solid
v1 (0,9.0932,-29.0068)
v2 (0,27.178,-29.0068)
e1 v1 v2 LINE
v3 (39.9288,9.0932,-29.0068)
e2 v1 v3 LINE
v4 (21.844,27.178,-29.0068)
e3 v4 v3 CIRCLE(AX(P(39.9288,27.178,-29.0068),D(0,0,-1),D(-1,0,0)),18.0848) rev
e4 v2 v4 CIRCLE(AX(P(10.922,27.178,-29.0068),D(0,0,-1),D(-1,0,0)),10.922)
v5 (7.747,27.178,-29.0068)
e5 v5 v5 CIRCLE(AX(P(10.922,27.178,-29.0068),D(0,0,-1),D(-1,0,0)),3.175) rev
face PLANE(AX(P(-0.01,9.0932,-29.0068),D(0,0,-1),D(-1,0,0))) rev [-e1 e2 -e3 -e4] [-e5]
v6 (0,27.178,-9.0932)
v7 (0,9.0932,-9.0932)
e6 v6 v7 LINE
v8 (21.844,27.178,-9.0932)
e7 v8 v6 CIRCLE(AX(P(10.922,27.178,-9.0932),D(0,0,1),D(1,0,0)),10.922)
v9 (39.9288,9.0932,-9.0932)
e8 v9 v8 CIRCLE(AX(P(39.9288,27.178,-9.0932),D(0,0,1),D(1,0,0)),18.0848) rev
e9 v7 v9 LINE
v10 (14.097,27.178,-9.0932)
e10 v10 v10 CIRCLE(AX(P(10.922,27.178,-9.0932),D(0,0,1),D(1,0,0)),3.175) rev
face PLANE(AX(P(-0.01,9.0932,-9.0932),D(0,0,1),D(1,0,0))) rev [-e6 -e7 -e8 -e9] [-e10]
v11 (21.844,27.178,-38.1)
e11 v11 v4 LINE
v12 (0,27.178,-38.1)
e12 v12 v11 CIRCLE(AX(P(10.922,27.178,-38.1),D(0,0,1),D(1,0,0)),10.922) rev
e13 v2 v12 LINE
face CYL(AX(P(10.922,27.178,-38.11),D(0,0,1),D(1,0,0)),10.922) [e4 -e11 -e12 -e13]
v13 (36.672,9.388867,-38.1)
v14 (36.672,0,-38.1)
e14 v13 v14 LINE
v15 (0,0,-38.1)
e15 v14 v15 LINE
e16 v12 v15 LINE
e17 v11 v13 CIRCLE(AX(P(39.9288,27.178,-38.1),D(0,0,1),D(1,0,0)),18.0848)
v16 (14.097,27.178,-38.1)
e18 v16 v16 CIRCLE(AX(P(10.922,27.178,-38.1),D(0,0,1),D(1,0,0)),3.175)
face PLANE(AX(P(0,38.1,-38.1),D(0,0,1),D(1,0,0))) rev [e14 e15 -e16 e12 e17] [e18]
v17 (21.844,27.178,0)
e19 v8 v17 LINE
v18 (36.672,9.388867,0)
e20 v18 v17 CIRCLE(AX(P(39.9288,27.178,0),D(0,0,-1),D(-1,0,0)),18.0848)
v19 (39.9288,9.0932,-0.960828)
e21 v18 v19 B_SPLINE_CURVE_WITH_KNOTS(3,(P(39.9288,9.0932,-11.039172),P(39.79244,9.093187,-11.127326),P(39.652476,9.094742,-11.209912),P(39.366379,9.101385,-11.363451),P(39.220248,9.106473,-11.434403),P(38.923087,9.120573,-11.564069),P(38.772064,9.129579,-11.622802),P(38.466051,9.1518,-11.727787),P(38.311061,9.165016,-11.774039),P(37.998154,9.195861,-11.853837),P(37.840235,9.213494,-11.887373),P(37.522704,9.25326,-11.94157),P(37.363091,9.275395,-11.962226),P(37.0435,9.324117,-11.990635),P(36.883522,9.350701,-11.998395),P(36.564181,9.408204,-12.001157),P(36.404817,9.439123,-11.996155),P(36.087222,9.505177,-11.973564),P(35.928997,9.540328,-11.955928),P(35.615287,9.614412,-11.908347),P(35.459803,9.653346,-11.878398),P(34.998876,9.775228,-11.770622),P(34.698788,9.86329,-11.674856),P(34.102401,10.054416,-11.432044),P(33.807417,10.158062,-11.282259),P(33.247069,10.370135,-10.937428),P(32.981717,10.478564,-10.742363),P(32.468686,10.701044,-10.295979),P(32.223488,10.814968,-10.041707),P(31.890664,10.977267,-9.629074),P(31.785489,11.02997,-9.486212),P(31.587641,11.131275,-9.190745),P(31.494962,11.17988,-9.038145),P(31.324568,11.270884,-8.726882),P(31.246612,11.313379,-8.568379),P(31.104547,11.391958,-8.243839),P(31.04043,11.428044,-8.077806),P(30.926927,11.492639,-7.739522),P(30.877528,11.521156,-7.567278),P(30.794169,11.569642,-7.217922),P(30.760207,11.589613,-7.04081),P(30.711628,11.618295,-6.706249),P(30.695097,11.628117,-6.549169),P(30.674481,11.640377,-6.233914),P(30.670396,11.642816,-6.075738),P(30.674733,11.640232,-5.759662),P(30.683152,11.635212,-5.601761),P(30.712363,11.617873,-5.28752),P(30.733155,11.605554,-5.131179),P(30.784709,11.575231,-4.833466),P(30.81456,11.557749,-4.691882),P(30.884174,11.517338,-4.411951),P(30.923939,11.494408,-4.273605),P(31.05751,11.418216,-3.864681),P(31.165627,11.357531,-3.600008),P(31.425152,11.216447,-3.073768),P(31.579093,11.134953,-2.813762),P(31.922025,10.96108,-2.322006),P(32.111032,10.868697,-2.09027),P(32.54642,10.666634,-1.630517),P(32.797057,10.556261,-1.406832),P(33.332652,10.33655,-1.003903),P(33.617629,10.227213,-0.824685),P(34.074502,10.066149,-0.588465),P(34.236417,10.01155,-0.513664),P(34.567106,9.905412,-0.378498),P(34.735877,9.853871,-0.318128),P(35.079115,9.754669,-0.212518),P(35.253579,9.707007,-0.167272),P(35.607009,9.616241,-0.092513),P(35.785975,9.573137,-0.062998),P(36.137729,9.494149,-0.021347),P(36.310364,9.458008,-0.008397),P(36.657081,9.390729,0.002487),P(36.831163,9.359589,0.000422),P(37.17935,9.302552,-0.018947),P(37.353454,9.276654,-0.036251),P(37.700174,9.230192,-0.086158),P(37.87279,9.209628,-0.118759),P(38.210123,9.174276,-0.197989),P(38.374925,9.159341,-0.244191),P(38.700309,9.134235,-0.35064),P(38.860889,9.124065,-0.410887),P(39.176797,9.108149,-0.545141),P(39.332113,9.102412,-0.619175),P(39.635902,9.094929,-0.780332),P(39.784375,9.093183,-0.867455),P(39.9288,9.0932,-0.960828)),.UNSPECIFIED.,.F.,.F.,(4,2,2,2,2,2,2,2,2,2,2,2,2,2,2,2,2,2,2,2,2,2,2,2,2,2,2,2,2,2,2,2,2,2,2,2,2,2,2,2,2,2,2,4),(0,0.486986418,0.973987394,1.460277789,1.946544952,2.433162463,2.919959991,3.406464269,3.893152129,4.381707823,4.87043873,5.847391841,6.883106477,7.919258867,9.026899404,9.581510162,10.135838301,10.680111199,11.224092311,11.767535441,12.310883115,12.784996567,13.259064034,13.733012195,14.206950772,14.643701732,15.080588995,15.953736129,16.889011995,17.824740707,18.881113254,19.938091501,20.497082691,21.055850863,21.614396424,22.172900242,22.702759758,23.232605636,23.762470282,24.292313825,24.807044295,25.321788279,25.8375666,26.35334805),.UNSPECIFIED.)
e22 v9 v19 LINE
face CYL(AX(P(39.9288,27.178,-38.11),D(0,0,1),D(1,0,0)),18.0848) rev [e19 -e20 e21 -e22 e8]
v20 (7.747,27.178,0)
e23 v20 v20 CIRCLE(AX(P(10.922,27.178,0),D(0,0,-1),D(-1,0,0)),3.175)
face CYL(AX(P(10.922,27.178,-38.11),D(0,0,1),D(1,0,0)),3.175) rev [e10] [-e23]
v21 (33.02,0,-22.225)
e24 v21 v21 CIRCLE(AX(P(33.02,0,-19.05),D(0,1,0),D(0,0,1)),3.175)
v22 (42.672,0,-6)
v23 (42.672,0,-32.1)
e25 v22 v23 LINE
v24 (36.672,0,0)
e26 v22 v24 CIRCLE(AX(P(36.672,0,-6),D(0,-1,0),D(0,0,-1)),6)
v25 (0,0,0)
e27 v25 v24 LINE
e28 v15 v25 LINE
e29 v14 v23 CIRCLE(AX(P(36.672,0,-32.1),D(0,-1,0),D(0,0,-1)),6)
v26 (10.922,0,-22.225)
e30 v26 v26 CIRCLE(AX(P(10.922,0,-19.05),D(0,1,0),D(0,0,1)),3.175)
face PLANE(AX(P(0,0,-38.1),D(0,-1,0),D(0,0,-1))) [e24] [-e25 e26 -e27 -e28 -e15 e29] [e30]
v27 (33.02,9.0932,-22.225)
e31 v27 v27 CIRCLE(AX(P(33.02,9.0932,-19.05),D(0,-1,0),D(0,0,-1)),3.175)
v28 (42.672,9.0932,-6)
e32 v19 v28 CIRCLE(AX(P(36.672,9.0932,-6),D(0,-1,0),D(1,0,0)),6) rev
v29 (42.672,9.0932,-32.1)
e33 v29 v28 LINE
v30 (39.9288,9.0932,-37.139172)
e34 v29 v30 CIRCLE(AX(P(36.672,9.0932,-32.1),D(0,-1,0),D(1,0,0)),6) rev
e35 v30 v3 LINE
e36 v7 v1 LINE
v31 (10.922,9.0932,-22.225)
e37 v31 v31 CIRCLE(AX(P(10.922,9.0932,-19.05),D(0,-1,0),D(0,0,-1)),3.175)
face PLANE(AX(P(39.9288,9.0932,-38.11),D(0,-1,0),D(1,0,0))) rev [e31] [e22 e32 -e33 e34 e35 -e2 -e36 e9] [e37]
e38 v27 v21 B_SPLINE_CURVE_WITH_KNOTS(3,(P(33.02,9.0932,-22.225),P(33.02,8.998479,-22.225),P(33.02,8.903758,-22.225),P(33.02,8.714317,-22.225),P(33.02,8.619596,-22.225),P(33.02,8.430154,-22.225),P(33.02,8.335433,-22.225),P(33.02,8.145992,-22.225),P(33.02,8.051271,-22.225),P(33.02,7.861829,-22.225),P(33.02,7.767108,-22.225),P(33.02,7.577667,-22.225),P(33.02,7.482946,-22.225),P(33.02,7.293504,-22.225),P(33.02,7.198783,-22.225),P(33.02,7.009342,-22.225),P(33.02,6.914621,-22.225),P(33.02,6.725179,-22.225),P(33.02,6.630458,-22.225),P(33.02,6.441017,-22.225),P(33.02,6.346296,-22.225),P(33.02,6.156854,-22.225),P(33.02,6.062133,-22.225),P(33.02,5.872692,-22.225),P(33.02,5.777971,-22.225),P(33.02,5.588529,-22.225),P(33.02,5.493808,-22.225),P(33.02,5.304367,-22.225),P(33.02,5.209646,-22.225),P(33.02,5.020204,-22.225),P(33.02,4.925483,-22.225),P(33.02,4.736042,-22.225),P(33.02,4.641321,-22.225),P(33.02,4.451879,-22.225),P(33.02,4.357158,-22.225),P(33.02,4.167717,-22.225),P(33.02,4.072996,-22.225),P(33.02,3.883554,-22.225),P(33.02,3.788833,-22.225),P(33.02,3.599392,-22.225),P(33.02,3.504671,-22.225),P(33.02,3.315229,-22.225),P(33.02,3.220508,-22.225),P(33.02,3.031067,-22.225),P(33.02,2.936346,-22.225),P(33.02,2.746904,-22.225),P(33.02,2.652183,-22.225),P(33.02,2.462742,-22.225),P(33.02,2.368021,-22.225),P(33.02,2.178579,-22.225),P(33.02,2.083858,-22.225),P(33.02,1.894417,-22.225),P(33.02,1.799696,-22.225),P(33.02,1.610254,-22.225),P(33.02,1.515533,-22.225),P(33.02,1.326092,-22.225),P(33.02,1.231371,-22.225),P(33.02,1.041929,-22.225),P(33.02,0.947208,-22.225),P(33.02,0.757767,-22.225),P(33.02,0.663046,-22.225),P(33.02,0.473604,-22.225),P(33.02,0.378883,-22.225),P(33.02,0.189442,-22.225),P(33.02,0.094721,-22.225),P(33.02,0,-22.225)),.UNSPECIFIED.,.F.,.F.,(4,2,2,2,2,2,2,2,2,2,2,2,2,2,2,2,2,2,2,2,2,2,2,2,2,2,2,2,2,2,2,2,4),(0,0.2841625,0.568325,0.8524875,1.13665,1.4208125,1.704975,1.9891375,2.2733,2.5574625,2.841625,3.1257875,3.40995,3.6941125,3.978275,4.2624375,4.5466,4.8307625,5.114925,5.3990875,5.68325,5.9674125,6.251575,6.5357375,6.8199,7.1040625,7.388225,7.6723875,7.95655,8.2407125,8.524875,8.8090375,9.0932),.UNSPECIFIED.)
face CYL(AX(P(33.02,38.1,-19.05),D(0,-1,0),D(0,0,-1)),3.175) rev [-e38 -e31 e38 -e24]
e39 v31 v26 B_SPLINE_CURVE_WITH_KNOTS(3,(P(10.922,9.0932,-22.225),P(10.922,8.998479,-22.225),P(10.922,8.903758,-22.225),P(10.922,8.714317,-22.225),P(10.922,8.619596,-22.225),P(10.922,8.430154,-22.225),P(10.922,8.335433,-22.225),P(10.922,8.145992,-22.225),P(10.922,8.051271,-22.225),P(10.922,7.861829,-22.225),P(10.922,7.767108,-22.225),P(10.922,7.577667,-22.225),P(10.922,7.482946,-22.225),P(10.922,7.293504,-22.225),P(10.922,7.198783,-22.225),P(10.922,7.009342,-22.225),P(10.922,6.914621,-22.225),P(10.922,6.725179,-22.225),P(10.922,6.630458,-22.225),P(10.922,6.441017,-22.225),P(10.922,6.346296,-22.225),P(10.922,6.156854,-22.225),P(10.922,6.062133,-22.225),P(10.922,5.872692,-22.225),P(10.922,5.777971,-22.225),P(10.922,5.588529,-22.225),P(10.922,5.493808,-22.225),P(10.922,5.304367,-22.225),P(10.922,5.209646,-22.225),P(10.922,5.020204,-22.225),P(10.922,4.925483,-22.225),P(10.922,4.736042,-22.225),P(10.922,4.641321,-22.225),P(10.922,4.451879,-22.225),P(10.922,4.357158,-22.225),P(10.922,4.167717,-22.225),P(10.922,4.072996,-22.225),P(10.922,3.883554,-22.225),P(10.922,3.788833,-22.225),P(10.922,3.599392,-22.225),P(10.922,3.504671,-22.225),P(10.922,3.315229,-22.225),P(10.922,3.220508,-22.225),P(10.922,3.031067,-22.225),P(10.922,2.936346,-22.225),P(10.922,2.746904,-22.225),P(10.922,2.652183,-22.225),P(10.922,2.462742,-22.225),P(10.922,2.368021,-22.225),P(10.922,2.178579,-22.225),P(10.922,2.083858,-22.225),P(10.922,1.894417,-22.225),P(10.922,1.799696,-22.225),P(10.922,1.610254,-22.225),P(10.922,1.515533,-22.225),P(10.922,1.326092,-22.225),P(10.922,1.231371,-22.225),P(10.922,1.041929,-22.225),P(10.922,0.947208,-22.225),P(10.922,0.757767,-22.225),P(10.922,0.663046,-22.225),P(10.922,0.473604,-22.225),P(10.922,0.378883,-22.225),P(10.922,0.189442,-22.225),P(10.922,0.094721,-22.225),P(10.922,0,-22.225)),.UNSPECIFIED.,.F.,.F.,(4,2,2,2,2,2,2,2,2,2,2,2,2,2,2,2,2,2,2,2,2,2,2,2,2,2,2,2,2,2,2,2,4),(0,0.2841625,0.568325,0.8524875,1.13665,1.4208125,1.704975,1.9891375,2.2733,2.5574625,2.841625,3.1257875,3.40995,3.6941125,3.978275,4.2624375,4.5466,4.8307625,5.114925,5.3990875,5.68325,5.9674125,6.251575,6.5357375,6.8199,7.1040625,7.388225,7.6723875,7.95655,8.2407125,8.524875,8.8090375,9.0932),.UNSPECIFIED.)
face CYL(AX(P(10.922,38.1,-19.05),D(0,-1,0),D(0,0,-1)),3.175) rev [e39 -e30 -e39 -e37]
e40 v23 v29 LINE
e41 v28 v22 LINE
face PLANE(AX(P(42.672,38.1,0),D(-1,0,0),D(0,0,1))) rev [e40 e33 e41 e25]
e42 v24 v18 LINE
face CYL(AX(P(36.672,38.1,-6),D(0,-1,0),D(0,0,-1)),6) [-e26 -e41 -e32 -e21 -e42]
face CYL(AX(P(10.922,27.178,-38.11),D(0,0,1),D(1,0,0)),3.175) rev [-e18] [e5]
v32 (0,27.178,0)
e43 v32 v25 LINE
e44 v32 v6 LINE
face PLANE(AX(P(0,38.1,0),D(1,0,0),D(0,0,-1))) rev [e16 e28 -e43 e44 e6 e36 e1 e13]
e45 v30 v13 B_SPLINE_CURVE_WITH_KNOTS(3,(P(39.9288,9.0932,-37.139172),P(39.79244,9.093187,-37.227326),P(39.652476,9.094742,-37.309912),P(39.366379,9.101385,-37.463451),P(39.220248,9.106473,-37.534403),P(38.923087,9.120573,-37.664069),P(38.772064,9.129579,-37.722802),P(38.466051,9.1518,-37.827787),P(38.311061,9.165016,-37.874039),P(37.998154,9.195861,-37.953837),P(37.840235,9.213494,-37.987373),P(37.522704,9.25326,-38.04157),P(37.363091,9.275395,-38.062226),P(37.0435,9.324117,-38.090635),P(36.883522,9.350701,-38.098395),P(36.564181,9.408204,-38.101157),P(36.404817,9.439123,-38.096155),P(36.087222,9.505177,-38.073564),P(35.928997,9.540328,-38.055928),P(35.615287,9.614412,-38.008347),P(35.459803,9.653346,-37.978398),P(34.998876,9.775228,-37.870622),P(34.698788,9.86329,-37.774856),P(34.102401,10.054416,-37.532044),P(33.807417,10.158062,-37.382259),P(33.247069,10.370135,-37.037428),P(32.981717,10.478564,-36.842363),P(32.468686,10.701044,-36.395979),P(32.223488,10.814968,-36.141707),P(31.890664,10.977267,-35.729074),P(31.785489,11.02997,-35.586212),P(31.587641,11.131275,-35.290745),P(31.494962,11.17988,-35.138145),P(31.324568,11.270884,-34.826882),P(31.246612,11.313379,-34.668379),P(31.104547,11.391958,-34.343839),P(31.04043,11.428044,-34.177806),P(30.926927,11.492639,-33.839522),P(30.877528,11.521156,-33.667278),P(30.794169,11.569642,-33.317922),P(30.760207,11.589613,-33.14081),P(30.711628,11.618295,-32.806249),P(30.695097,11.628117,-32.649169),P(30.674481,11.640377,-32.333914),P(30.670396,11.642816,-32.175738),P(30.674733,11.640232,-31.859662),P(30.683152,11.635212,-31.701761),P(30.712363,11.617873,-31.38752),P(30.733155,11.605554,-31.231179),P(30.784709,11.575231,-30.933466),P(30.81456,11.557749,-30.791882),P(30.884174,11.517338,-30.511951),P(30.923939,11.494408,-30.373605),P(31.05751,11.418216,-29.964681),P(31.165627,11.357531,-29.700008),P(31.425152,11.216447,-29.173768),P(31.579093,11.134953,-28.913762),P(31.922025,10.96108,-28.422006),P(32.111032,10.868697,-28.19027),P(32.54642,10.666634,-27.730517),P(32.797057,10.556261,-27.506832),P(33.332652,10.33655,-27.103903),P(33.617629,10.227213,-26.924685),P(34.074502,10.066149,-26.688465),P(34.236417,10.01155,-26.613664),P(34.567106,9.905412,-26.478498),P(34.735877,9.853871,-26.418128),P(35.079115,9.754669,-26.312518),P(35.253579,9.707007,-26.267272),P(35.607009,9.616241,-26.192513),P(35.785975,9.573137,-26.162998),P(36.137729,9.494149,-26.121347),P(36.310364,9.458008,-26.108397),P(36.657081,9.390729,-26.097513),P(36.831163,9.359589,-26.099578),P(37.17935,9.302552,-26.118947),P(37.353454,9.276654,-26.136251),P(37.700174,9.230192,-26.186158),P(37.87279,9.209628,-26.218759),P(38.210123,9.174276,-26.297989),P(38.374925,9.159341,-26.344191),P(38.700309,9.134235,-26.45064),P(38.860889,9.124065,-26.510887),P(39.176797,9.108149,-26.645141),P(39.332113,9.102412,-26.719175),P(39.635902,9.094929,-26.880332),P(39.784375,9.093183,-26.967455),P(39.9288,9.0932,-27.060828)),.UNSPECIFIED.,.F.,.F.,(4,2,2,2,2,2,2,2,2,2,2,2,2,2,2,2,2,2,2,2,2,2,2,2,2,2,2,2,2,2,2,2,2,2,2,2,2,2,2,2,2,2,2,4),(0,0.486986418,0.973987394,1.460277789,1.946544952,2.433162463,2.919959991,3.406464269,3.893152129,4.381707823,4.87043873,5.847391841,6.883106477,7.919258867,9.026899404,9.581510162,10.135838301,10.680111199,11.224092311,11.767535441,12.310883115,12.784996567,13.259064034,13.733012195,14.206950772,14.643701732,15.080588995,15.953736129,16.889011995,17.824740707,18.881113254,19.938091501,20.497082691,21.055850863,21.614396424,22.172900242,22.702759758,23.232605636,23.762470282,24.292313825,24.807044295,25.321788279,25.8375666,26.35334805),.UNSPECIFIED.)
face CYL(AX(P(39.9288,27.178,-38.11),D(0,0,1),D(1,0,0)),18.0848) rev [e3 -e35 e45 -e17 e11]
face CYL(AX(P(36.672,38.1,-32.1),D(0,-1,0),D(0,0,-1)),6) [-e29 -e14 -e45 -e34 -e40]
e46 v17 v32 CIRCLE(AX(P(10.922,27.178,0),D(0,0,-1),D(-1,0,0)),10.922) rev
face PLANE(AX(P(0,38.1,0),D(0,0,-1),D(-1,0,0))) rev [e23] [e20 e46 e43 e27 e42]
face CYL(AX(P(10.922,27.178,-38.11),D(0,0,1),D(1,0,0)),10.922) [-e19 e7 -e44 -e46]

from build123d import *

# Parameters (mm, degrees)
SKETCH1_W              = 42.672
SKETCH1_H              = 38.1
BOSS_EXTRUDE1_DEPTH    = 38.1
SKETCH3_R              = 3.175
CUT_EXTRUDE1_DEPTH     = 69.732231042
FILLET1_R              = 6
SPLIT1_START           = -38.1
SPLIT1_OUTLINE_R       = 3.175
SPLIT1_DEPTH           = 38.1
SPLIT2_SURFACE_1_BACK  = 69.732
SPLIT2_SURFACE_1_DEPTH = 139.464


# Read off the part's stored shape, not the designer's step: Split1
with BuildPart() as part:
    # Sketch1 → Boss-Extrude1 (new body)
    with BuildSketch(Plane(origin=(0, 0, 0), x_dir=(1, 0, 0), z_dir=(0, 1, 0))):
        with Locations((21.336, 19.05)):
            Rectangle(SKETCH1_W, SKETCH1_H)
    extrude(amount=BOSS_EXTRUDE1_DEPTH)

    # Sketch3 → Cut-Extrude1 (cut, through all)
    with BuildSketch(Plane(origin=(0, 0, 0), x_dir=(1, 0, 0), z_dir=(0, 1, 0))):
        with Locations(Location((10.922, 19.05, 0), (0, 0, 90))):
            Circle(SKETCH3_R)
        with Locations(Location((33.02, 19.05, 0), (0, 0, 90))):
            Circle(SKETCH3_R)
    extrude(amount=CUT_EXTRUDE1_DEPTH, mode=Mode.SUBTRACT)

    # Fillet1
    fillet1_edges = [part.edges().sort_by_distance(p)[0] for p in [
        (42.672, 19.05, -38.1),
        (42.672, 19.05, 0),
    ]]
    fillet(fillet1_edges, radius=FILLET1_R)

    # Split1 outline → Split1 (cut)
    with BuildSketch(Plane.XY.offset(SPLIT1_START)):
        with Locations((10.922, 27.178)):
            Circle(SPLIT1_OUTLINE_R)
        with BuildLine():
            ThreePointArc((21.844, 27.178), (27.140915284, 14.390115284), (39.9288, 9.0932))
            Line((39.9288, 9.0932), (42.672, 9.0932))
            Line((42.672, 9.0932), (42.672, 38.1))
            Line((42.672, 38.1), (10.922, 38.1))
            ThreePointArc((10.922, 38.1), (18.645020264, 34.901020264), (21.844, 27.178))
        make_face()
        with BuildLine():
            ThreePointArc((0, 27.178), (3.198979736, 34.901020264), (10.922, 38.1))
            Line((10.922, 38.1), (0, 38.1))
            Line((0, 38.1), (0, 27.178))
        make_face()
    extrude(amount=SPLIT1_DEPTH, mode=Mode.SUBTRACT)

    # Split2: cut with a surface, the side behind it stays
    # Split2 surface: a surface, the sketch's curves swept straight by 139.464 mm
    with BuildLine(Plane(origin=(42.672, 0, 0), x_dir=(0, 0, -1), z_dir=(1, 0, 0)).offset(-SPLIT2_SURFACE_1_BACK), mode=Mode.PRIVATE) as split2_surface_1_path:
        Line((9.0932, 38.1), (9.0932, 9.0932))
        Line((9.0932, 9.0932), (29.0068, 9.0932))
        Line((29.0068, 9.0932), (29.0068, 38.1))
    split2_surface_1 = Shell.extrude(split2_surface_1_path.wire(), (1 * SPLIT2_SURFACE_1_DEPTH, 0 * SPLIT2_SURFACE_1_DEPTH, 0 * SPLIT2_SURFACE_1_DEPTH))
    split(bisect_by=split2_surface_1, keep=Keep.BOTTOM)


solid = part.part
